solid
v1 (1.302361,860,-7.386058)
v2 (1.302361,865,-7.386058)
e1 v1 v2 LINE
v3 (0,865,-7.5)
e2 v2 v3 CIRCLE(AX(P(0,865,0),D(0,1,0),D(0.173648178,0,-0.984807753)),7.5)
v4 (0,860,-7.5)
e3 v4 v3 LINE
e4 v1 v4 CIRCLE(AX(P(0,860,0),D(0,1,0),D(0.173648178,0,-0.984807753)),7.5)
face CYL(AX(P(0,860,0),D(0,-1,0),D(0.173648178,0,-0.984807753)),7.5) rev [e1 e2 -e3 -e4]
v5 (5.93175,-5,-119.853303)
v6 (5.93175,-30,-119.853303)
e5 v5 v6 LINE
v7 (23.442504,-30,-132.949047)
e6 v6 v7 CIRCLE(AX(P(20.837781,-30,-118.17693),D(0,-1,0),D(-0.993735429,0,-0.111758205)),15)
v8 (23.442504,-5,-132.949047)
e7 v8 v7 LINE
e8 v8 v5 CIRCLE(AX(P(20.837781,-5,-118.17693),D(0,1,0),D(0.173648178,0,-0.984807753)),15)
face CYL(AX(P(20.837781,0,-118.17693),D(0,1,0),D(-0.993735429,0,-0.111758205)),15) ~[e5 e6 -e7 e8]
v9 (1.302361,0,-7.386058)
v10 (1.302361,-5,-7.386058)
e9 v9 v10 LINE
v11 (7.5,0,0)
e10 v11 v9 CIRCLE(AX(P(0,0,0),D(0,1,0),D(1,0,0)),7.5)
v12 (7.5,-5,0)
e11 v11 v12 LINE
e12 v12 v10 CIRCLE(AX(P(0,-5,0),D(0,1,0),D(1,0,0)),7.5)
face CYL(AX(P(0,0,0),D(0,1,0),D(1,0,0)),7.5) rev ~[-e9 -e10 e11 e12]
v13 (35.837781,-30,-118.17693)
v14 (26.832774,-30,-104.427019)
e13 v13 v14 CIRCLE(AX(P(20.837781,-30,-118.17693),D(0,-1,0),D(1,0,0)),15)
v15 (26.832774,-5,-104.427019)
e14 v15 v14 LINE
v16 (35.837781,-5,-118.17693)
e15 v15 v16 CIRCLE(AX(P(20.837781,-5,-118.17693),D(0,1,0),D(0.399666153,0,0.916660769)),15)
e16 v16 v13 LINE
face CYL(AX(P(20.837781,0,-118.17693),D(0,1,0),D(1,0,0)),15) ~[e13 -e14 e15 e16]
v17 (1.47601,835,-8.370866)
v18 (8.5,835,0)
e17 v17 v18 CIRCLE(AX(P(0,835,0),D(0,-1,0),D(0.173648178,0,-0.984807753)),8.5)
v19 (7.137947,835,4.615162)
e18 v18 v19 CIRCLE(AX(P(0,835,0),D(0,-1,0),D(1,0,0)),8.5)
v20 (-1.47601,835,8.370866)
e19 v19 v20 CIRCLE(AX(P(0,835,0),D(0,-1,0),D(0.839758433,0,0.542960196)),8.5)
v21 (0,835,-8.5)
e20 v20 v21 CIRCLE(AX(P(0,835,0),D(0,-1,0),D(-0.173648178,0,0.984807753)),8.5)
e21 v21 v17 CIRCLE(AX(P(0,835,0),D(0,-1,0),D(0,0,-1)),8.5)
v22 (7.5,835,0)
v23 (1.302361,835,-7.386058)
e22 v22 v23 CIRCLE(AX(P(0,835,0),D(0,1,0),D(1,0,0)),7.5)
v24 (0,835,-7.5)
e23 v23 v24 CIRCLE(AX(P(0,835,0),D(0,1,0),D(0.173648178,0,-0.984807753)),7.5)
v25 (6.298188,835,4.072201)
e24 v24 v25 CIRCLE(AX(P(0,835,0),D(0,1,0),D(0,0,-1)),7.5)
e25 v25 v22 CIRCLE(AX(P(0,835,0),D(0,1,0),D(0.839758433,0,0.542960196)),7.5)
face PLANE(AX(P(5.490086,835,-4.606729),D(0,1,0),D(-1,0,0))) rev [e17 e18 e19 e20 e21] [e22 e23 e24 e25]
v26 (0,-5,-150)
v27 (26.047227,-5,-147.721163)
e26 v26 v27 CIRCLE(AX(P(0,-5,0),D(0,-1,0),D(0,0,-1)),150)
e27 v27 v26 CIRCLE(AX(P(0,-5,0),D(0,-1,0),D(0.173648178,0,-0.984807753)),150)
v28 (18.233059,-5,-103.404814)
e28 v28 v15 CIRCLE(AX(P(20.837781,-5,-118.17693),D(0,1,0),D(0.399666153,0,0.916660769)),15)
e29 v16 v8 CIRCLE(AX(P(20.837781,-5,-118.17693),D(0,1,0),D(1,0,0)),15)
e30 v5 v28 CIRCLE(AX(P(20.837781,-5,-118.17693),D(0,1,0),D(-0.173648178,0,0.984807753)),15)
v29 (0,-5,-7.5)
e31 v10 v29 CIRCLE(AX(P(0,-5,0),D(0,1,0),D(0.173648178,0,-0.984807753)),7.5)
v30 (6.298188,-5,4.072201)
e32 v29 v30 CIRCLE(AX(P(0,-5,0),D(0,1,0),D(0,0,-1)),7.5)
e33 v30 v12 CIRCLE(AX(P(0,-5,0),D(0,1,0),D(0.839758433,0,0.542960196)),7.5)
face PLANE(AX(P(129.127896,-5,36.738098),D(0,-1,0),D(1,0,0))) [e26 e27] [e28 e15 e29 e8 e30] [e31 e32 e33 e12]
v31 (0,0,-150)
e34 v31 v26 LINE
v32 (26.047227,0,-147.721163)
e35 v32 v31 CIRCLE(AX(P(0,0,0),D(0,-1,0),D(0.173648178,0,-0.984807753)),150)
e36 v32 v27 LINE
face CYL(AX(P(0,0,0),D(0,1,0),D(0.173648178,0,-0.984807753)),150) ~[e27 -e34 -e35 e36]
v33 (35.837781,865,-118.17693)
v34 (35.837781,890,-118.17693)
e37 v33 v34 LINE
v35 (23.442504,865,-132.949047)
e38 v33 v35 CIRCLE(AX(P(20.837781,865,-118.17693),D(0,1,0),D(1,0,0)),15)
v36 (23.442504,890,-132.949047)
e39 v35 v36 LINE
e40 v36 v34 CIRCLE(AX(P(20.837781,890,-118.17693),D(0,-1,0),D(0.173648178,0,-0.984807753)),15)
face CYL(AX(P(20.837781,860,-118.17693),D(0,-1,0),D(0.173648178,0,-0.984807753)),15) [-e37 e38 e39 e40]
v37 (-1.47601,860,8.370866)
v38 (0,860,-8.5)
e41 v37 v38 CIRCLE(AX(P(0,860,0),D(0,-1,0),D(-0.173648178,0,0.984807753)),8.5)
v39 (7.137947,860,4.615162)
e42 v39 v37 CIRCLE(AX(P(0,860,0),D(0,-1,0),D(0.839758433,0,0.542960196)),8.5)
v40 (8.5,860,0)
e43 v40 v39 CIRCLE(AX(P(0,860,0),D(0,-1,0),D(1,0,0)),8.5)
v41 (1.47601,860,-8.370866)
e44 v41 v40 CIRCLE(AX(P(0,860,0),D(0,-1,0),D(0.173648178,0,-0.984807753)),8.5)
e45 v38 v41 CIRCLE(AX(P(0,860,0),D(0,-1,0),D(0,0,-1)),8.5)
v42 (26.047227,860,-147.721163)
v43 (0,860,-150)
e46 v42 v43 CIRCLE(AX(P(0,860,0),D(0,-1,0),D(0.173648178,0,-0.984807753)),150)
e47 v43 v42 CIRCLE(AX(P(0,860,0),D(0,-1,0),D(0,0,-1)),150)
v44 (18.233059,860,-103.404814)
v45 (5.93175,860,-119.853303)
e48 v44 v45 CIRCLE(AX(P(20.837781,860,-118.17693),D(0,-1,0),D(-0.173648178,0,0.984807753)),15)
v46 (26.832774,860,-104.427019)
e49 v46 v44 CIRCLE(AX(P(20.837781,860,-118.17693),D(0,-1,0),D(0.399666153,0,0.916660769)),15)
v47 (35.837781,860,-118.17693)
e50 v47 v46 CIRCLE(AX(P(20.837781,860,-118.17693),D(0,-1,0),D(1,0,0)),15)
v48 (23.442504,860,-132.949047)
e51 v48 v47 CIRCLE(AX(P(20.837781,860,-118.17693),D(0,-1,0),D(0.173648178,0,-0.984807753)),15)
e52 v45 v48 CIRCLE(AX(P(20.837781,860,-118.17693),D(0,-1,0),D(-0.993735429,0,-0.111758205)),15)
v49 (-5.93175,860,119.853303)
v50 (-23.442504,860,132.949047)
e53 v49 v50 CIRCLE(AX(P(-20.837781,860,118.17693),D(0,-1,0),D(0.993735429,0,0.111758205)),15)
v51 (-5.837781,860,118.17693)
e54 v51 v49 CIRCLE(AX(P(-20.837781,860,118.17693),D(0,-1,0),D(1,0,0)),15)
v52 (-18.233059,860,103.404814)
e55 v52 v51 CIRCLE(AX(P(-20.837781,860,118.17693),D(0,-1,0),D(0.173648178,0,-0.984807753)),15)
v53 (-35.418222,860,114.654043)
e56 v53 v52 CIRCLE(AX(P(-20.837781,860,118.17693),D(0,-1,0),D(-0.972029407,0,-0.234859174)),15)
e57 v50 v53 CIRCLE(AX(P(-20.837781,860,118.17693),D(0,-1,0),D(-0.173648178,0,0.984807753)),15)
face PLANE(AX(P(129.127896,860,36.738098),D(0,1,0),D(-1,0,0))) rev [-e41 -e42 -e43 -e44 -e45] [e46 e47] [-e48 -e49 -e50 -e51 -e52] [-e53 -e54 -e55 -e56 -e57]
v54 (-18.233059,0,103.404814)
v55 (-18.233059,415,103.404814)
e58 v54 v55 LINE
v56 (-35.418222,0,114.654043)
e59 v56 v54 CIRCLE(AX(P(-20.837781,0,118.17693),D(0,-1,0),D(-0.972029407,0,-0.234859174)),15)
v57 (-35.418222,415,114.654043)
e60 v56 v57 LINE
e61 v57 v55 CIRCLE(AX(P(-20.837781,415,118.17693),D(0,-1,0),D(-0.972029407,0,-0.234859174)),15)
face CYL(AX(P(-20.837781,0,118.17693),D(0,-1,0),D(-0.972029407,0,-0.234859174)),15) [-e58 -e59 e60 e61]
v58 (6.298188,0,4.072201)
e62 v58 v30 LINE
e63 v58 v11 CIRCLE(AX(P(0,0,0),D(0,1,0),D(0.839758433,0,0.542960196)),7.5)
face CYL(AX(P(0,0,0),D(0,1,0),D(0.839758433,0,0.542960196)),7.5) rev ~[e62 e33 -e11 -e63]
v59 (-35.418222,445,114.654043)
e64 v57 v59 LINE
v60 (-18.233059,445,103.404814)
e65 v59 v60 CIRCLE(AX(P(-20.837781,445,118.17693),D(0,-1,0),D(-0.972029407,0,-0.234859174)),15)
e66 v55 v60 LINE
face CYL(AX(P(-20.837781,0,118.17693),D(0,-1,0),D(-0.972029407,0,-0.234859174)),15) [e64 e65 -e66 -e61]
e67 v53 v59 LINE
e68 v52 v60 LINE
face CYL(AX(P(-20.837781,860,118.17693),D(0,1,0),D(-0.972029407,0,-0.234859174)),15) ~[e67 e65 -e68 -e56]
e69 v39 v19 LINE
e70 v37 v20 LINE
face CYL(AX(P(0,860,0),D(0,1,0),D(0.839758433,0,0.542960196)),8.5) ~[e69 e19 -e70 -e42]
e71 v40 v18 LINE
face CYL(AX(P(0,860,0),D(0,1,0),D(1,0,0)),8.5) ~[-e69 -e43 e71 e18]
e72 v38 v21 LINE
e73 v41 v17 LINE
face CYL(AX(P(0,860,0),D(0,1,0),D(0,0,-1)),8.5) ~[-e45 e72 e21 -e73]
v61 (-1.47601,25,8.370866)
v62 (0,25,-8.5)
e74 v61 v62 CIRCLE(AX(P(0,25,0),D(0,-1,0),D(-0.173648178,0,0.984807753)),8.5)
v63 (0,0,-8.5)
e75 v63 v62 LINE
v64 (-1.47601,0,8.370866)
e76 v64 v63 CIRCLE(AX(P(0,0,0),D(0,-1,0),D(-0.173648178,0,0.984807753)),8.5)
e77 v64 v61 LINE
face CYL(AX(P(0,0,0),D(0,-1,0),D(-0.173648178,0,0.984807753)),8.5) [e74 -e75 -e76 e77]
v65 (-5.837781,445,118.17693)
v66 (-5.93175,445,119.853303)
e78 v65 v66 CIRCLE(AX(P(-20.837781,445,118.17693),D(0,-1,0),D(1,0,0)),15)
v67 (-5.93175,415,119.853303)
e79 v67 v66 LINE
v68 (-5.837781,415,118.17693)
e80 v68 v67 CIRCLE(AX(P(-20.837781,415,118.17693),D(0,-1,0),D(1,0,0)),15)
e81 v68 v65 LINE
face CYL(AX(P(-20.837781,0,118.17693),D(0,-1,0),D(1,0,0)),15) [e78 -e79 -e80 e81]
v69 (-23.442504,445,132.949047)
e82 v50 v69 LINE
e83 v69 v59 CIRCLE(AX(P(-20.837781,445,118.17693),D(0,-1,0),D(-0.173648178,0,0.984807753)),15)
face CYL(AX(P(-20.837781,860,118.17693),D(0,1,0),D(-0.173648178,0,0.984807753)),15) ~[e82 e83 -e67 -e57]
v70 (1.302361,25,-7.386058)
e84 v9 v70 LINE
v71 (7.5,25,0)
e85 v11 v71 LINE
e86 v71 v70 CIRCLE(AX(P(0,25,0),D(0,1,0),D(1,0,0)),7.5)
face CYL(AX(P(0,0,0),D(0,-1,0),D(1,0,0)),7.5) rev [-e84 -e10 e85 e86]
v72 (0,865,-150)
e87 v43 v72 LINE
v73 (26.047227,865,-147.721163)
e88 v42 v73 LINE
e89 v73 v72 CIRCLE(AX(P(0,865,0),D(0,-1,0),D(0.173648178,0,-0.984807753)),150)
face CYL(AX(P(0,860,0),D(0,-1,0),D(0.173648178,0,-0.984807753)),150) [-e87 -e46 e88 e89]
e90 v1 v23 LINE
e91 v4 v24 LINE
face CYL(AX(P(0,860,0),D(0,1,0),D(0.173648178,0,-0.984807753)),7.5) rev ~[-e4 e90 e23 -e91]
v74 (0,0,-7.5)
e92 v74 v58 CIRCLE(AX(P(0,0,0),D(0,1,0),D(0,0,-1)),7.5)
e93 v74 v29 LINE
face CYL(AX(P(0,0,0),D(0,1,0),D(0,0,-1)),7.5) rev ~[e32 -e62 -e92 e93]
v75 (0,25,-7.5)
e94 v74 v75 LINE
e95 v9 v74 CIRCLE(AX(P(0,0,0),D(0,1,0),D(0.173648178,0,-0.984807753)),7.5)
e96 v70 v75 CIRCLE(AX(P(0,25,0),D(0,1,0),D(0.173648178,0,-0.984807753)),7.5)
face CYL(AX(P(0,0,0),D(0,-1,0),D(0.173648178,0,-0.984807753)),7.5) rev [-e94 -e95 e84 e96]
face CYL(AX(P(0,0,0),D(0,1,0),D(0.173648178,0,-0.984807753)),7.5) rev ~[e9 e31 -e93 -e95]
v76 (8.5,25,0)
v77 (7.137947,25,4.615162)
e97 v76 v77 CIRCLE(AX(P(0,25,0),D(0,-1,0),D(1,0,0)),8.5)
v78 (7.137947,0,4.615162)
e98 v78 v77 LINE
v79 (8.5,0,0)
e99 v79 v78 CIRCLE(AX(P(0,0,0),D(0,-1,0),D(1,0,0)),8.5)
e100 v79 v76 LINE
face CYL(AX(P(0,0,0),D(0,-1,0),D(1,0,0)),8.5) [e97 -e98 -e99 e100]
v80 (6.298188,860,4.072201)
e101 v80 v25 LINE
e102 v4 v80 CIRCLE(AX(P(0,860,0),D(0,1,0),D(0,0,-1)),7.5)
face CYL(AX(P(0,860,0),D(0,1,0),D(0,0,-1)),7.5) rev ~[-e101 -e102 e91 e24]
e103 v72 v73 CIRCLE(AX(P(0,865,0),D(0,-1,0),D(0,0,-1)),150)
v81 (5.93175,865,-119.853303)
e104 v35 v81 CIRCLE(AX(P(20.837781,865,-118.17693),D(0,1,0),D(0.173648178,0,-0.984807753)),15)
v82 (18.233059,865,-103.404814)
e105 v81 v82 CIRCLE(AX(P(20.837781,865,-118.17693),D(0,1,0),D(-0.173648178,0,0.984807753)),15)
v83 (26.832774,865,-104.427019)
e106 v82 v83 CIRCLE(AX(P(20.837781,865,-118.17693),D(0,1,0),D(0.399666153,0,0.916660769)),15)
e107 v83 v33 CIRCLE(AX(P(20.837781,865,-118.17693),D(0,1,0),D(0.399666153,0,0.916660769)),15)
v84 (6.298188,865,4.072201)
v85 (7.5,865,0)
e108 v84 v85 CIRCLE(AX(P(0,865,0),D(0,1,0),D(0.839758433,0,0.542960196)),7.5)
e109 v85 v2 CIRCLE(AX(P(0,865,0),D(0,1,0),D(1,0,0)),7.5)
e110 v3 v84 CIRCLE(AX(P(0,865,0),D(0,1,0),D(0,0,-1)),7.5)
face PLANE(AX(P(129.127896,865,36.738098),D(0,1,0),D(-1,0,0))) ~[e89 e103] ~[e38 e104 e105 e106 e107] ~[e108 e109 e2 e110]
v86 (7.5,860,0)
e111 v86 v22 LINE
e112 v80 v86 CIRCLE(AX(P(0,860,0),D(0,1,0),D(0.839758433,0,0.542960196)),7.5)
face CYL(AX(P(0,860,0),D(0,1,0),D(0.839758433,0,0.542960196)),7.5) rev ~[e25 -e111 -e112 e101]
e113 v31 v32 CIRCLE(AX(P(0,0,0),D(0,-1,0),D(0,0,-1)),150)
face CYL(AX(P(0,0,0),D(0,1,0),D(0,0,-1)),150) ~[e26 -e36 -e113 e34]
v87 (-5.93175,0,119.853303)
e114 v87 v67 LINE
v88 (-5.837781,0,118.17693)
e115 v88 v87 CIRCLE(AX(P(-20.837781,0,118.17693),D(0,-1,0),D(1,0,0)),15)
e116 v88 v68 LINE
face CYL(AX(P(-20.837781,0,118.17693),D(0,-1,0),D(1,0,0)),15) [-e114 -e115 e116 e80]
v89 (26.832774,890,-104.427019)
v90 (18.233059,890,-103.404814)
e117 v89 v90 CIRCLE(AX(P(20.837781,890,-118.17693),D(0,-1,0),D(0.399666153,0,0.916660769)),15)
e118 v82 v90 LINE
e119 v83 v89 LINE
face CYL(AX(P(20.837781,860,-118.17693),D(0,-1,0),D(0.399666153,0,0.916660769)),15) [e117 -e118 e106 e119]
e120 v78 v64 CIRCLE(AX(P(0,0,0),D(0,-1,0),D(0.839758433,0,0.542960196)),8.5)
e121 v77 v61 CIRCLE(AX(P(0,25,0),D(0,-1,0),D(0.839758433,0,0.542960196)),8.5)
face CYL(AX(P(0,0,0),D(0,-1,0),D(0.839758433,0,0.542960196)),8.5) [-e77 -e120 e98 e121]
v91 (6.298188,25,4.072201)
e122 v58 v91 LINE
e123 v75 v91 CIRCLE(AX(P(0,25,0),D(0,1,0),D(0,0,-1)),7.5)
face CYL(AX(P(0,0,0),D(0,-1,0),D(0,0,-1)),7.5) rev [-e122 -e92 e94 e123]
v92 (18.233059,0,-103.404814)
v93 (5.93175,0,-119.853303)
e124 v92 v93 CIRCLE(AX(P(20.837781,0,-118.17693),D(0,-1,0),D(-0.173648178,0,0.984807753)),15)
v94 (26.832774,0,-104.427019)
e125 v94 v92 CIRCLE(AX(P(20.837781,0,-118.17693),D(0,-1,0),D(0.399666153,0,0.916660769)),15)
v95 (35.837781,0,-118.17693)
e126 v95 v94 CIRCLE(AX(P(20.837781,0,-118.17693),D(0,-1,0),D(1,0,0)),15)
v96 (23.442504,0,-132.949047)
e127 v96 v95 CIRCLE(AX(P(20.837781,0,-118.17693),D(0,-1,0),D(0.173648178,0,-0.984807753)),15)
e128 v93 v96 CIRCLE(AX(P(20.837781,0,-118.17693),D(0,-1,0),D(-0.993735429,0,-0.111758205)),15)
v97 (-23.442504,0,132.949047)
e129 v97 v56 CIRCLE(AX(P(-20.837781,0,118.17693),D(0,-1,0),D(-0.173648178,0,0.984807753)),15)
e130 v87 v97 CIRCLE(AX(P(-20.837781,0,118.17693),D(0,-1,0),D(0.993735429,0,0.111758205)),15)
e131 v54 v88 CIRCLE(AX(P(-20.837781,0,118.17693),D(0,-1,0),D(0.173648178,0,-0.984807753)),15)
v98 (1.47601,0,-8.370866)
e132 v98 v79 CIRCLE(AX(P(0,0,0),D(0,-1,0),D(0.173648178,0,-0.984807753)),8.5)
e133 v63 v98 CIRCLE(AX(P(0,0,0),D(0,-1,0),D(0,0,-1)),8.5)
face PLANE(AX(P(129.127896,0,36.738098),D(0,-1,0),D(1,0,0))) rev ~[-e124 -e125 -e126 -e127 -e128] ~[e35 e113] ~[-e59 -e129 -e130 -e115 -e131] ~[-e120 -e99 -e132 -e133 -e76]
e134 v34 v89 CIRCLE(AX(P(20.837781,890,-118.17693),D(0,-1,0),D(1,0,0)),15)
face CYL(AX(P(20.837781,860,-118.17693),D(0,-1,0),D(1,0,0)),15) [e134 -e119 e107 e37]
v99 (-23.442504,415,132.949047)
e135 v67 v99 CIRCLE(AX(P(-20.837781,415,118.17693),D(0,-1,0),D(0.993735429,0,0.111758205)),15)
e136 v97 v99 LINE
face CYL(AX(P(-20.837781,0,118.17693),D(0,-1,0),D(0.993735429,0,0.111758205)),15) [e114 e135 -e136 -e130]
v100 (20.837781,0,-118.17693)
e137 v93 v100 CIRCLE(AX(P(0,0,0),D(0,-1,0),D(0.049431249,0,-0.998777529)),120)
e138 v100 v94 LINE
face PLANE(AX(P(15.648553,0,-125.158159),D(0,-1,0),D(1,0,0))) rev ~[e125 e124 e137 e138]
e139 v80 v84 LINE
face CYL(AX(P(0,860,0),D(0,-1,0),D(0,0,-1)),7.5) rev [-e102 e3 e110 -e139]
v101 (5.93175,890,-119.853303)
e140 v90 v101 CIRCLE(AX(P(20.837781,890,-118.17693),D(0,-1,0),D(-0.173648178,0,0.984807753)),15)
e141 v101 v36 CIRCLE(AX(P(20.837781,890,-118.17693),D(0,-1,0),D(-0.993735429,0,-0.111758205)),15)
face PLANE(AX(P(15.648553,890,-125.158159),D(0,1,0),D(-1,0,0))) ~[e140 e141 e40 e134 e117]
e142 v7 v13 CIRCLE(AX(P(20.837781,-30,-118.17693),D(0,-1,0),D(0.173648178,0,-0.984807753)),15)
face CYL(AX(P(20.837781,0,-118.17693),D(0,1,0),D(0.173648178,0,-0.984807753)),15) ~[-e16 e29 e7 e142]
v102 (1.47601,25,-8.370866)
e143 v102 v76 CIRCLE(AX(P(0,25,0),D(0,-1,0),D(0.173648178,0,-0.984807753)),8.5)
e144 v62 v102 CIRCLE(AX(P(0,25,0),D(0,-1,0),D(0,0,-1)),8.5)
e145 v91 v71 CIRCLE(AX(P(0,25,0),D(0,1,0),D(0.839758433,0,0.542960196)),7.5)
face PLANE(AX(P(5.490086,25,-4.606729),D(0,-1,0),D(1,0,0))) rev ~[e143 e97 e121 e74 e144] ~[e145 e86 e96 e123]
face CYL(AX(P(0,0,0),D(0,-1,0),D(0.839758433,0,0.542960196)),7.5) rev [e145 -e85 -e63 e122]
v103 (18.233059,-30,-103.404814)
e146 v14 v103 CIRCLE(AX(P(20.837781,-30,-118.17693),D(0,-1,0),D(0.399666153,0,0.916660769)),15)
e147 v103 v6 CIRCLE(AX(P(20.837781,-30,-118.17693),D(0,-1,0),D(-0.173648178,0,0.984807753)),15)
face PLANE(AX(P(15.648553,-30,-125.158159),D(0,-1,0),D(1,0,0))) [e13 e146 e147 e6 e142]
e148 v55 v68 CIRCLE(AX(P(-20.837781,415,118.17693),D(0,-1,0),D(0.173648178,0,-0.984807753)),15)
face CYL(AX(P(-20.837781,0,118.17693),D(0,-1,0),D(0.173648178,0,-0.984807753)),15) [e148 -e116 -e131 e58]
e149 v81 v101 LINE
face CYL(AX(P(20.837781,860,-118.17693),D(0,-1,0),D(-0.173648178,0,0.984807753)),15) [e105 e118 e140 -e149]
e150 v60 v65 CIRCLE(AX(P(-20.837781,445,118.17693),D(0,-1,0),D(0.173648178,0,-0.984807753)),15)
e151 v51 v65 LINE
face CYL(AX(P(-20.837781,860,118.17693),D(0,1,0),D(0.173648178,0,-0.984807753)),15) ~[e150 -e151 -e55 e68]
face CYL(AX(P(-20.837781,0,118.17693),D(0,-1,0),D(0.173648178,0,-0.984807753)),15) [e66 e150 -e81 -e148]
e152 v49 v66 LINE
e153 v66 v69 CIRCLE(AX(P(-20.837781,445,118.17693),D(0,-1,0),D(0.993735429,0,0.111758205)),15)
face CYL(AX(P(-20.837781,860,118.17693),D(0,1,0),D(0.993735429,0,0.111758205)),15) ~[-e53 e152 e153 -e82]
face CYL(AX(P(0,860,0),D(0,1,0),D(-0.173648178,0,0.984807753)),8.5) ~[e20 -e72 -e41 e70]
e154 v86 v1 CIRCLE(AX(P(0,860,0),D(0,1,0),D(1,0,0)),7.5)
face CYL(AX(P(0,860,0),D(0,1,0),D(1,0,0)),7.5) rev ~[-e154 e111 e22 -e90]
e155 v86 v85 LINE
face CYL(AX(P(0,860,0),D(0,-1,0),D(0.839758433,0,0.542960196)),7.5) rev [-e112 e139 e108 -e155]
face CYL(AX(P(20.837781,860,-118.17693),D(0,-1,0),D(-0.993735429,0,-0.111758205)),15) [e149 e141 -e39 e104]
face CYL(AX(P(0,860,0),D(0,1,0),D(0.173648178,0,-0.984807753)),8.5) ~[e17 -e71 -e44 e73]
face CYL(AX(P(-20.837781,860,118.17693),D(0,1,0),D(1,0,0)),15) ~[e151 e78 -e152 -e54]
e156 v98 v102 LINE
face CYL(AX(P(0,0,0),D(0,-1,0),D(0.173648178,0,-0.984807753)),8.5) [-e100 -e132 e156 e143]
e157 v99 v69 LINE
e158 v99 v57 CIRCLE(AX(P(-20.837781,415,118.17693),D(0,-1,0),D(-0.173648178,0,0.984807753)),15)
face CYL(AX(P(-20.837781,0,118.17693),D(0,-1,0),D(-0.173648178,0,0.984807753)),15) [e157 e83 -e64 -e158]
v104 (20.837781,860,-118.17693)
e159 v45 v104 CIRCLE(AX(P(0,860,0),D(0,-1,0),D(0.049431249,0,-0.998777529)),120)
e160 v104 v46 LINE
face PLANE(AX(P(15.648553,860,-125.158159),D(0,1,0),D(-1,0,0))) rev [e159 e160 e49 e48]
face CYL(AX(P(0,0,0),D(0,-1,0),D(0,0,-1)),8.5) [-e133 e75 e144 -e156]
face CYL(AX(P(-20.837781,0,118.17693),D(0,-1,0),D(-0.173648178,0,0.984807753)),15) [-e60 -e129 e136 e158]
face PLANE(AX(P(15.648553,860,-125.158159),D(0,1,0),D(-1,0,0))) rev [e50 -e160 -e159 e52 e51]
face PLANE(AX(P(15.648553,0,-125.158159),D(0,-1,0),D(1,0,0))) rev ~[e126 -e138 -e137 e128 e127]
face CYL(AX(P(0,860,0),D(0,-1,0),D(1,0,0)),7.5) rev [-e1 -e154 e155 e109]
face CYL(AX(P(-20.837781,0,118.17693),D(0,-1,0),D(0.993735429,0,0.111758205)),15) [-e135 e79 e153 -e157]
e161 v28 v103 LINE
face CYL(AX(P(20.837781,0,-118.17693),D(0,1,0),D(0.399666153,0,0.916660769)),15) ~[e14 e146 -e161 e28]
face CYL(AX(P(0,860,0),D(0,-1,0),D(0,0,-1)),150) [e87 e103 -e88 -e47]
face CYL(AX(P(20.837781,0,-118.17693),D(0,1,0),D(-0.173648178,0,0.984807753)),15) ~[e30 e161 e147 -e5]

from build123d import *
from build123d import SkipClean  # not in build123d's __all__

# Parameters (mm, degrees)
F1_DEPTH = 25
F2_DEPTH = 445
F3_DEPTH = 30
F4_DEPTH = 5


# Not quite as in the source:
# - after a boolean that leaves OpenCascade's solid faulty, fix() repairs it


with BuildPart() as f1:
    # F0 (on Front) → F1 (new body)
    with BuildSketch(Plane.XZ):
        with BuildLine():
            ThreePointArc((1.4760095102, -8.3708659006), (6.5113777665, -5.4636946823), (8.5, 0))
            Line((8.5, 0), (7.5, 0))
            ThreePointArc((7.5, 0), (5.7453333234, -4.8209070726), (1.3023613325, -7.3860581476))
            Line((1.3023613325, -7.3860581476), (1.4760095102, -8.3708659006))
        make_face()
        with BuildLine():
            Line((7.5, 0), (8.5, 0))
            ThreePointArc((8.5, 0), (8.1523783886, 2.405977267), (7.1379466801, 4.6151616647))
            Line((7.1379466801, 4.6151616647), (6.2981882472, 4.0722014689))
            ThreePointArc((6.2981882472, 4.0722014689), (7.1932750487, 2.122921118), (7.5, 0))
        make_face()
        with BuildLine():
            ThreePointArc((-1.4760095102, 8.3708659006), (-8.4676549338, -0.7408238134), (0, -8.5))
            Line((0, -8.5), (0, -7.5))
            ThreePointArc((0, -7.5), (-7.4714602357, -0.6536680706), (-1.3023613325, 7.3860581476))
            Line((-1.3023613325, 7.3860581476), (-1.4760095102, 8.3708659006))
        make_face()
        with BuildLine():
            Line((0, -7.5), (0, -8.5))
            ThreePointArc((0, -8.5), (0.7408238134, -8.4676549338), (1.4760095102, -8.3708659006))
            Line((1.4760095102, -8.3708659006), (1.3023613325, -7.3860581476))
            ThreePointArc((1.3023613325, -7.3860581476), (0.6536680706, -7.4714602357), (0, -7.5))
        make_face()
        with BuildLine():
            Line((6.2981882472, 4.0722014689), (7.1379466801, 4.6151616647))
            ThreePointArc((7.1379466801, 4.6151616647), (3.397162302, 7.7916165392), (-1.4760095102, 8.3708659006))
            Line((-1.4760095102, 8.3708659006), (-1.3023613325, 7.3860581476))
            ThreePointArc((-1.3023613325, 7.3860581476), (2.9974961488, 6.8749557699), (6.2981882472, 4.0722014689))
        make_face()
    extrude(amount=-F1_DEPTH)



with BuildPart() as f2:
    # F0 (on Front) → F2 (new body)
    with BuildSketch(Plane.XZ):
        with BuildLine():
            ThreePointArc((-5.9317498787, 119.8533034312), (-11.8541755818, 130.1892085775), (-23.442503985, 132.9490466566))
            Line((-23.442503985, 132.9490466566), (-20.83778132, 118.1769303615))
            ThreePointArc((-20.83778132, 118.1769303615), (-13.4109845581, 119.2482515309), (-5.9317498787, 119.8533034312))
        make_face()
        with BuildLine():
            Line((-20.83778132, 118.1769303615), (-23.442503985, 132.9490466566))
            ThreePointArc((-23.442503985, 132.9490466566), (-33.3880504574, 126.3922054378), (-35.4182224283, 114.6540427548))
            ThreePointArc((-35.4182224283, 114.6540427548), (-28.1831008533, 116.6435288659), (-20.83778132, 118.1769303615))
        make_face()
        with BuildLine():
            ThreePointArc((-5.9317498787, 119.8533034312), (-13.4109845581, 119.2482515309), (-20.83778132, 118.1769303615))
            Line((-20.83778132, 118.1769303615), (-18.233058655, 103.4048140663))
            ThreePointArc((-18.233058655, 103.4048140663), (-9.3471146732, 108.5351162162), (-5.83778132, 118.1769303615))
            ThreePointArc((-5.83778132, 118.1769303615), (-5.8612918846, 119.016432708), (-5.9317498787, 119.8533034312))
        make_face()
        with BuildLine():
            Line((-18.233058655, 103.4048140663), (-20.83778132, 118.1769303615))
            ThreePointArc((-20.83778132, 118.1769303615), (-28.1831008533, 116.6435288659), (-35.4182224283, 114.6540427548))
            ThreePointArc((-35.4182224283, 114.6540427548), (-29.0530563964, 105.6266612241), (-18.233058655, 103.4048140663))
        make_face()
    extrude(amount=-F2_DEPTH)


with BuildPart() as f3:
    # F0 (on Front) → F3 (new body)
    with BuildSketch(Plane.XZ):
        with BuildLine():
            ThreePointArc((5.9317498787, -119.8533034312), (11.8541755818, -130.1892085775), (23.442503985, -132.9490466566))
            Line((23.442503985, -132.9490466566), (20.83778132, -118.1769303615))
            ThreePointArc((20.83778132, -118.1769303615), (13.4109845581, -119.2482515309), (5.9317498787, -119.8533034312))
        make_face()
        with BuildLine():
            Line((20.83778132, -118.1769303615), (23.442503985, -132.9490466566))
            ThreePointArc((23.442503985, -132.9490466566), (32.3284479668, -127.8187445068), (35.83778132, -118.1769303615))
            ThreePointArc((35.83778132, -118.1769303615), (35.7325222816, -116.4030386826), (35.4182224283, -114.6540427548))
            ThreePointArc((35.4182224283, -114.6540427548), (28.1831008533, -116.6435288659), (20.83778132, -118.1769303615))
        make_face()
        with BuildLine():
            ThreePointArc((20.83778132, -118.1769303615), (28.1831008533, -116.6435288659), (35.4182224283, -114.6540427548))
            ThreePointArc((35.4182224283, -114.6540427548), (32.3262590082, -108.5325081181), (26.8327736176, -104.4270188217))
            Line((26.8327736176, -104.4270188217), (20.83778132, -118.1769303615))
        make_face()
        with BuildLine():
            Line((18.233058655, -103.4048140663), (20.83778132, -118.1769303615))
            Line((20.83778132, -118.1769303615), (26.8327736176, -104.4270188217))
            ThreePointArc((26.8327736176, -104.4270188217), (22.6082918921, -103.2817871156), (18.233058655, -103.4048140663))
        make_face()
        with BuildLine():
            ThreePointArc((5.9317498787, -119.8533034312), (13.4109845581, -119.2482515309), (20.83778132, -118.1769303615))
            Line((20.83778132, -118.1769303615), (18.233058655, -103.4048140663))
            ThreePointArc((18.233058655, -103.4048140663), (8.8255031039, -109.1933246233), (5.9317498787, -119.8533034312))
        make_face()
    extrude(amount=F3_DEPTH)


with BuildPart() as f1_1:
    add(f1.part, clean=False)

    with SkipClean():  # cleaning this boolean's faces spoils the solid; the shape is the same uncleaned
        add(f2.part)  # F4 merges F2

    with SkipClean():  # cleaning this boolean's faces spoils the solid; the shape is the same uncleaned
        add(f3.part)  # F4 merges F3
    # F0 (on Front) → F4 (join)
    with BuildSketch(Plane.XZ):
        with BuildLine():
            Line((120, 0), (150, 0))
            ThreePointArc((150, 0), (143.8655009749, 42.4584223594), (125.9637649434, 81.4440293778))
            Line((125.9637649434, 81.4440293778), (113.367388449, 73.29962644))
            ThreePointArc((113.367388449, 73.29962644), (115.1575620522, 69.4010657382), (115.7710119547, 65.1552235022))
            ThreePointArc((115.7710119547, 65.1552235022), (113.7154721999, 57.5762427686), (108.11221876, 52.0744481949))
            ThreePointArc((108.11221876, 52.0744481949), (116.9903121015, 26.7070566406), (120, 0))
        make_face()
        with BuildLine():
            ThreePointArc((26.04722665, -147.7211629518), (114.9066664678, -96.418141453), (150, 0))
            Line((150, 0), (120, 0))
            ThreePointArc((120, 0), (96.5665229036, -71.2383790825), (35.4182224283, -114.6540427548))
            ThreePointArc((35.4182224283, -114.6540427548), (35.7325222816, -116.4030386826), (35.83778132, -118.1769303615))
            ThreePointArc((35.83778132, -118.1769303615), (32.3284479668, -127.8187445068), (23.442503985, -132.9490466566))
            Line((23.442503985, -132.9490466566), (26.04722665, -147.7211629518))
        make_face()
        with BuildLine():
            Line((113.367388449, 73.29962644), (125.9637649434, 81.4440293778))
            ThreePointArc((125.9637649434, 81.4440293778), (59.949922976, 137.4991153978), (-26.04722665, 147.7211629518))
            Line((-26.04722665, 147.7211629518), (-23.442503985, 132.9490466566))
            ThreePointArc((-23.442503985, 132.9490466566), (-11.8541755818, 130.1892085775), (-5.9317498787, 119.8533034312))
            ThreePointArc((-5.9317498787, 119.8533034312), (47.9599383808, 109.9992923182), (91.8552580876, 77.2179484424))
            ThreePointArc((91.8552580876, 77.2179484424), (103.4589586729, 79.9124231838), (113.367388449, 73.29962644))
        make_face()
        with BuildLine():
            ThreePointArc((0, -150), (13.0733614121, -149.4292047138), (26.04722665, -147.7211629518))
            Line((26.04722665, -147.7211629518), (23.442503985, -132.9490466566))
            ThreePointArc((23.442503985, -132.9490466566), (11.8541755818, -130.1892085775), (5.9317498787, -119.8533034312))
            ThreePointArc((5.9317498787, -119.8533034312), (2.9667817794, -119.963320252), (0, -120))
            Line((0, -120), (0, -150))
        make_face()
        with BuildLine():
            ThreePointArc((35.4182224283, -114.6540427548), (96.5665229036, -71.2383790825), (120, 0))
            Line((120, 0), (72.3631882451, 0))
            Line((72.3631882451, 0), (26.8327736176, -104.4270188217))
            ThreePointArc((26.8327736176, -104.4270188217), (32.3262590082, -108.5325081181), (35.4182224283, -114.6540427548))
        make_face()
        with BuildLine():
            Line((72.3631882451, 0), (120, 0))
            ThreePointArc((120, 0), (116.9903121015, 26.7070566406), (108.11221876, 52.0744481949))
            ThreePointArc((108.11221876, 52.0744481949), (101.522682893, 50.1740689806), (94.7760196571, 51.4053119625))
            Line((94.7760196571, 51.4053119625), (72.3631882451, 0))
        make_face()
        with BuildLine():
            Line((-23.442503985, 132.9490466566), (-26.04722665, 147.7211629518))
            ThreePointArc((-26.04722665, 147.7211629518), (-149.4292047138, -13.0733614122), (0, -150))
            Line((0, -150), (0, -120))
            ThreePointArc((0, -120), (-118.6559841107, -17.9097022508), (-35.4182224283, 114.6540427548))
            ThreePointArc((-35.4182224283, 114.6540427548), (-33.3880504574, 126.3922054378), (-23.442503985, 132.9490466566))
        make_face()
        with BuildLine():
            ThreePointArc((115.7710119547, 65.1552235022), (115.1575620522, 69.4010657382), (113.367388449, 73.29962644))
            Line((113.367388449, 73.29962644), (100.7710119547, 65.1552235022))
            ThreePointArc((100.7710119547, 65.1552235022), (104.6462024591, 58.7296544421), (108.11221876, 52.0744481949))
            ThreePointArc((108.11221876, 52.0744481949), (113.7154721999, 57.5762427686), (115.7710119547, 65.1552235022))
        make_face()
        with BuildLine():
            Line((100.7710119547, 65.1552235022), (113.367388449, 73.29962644))
            ThreePointArc((113.367388449, 73.29962644), (103.4589586729, 79.9124231838), (91.8552580876, 77.2179484424))
            ThreePointArc((91.8552580876, 77.2179484424), (96.5017995213, 71.3260309365), (100.7710119547, 65.1552235022))
        make_face()
        with BuildLine():
            Line((26.8327736176, -104.4270188217), (72.3631882451, 0))
            Line((72.3631882451, 0), (8.5, 0))
            ThreePointArc((8.5, 0), (6.5113777665, -5.4636946823), (1.4760095102, -8.3708659006))
            Line((1.4760095102, -8.3708659006), (18.233058655, -103.4048140663))
            ThreePointArc((18.233058655, -103.4048140663), (22.6082918921, -103.2817871156), (26.8327736176, -104.4270188217))
        make_face()
        with BuildLine():
            Line((8.5, 0), (72.3631882451, 0))
            Line((72.3631882451, 0), (94.7760196571, 51.4053119625))
            ThreePointArc((94.7760196571, 51.4053119625), (91.0619862538, 53.7212906732), (88.1746354604, 57.0108205645))
            Line((88.1746354604, 57.0108205645), (7.1379466801, 4.6151616647))
            ThreePointArc((7.1379466801, 4.6151616647), (8.1523783886, 2.405977267), (8.5, 0))
        make_face()
        with BuildLine():
            ThreePointArc((94.7760196571, 51.4053119625), (101.522682893, 50.1740689806), (108.11221876, 52.0744481949))
            ThreePointArc((108.11221876, 52.0744481949), (104.6462024591, 58.7296544421), (100.7710119547, 65.1552235022))
            Line((100.7710119547, 65.1552235022), (94.7760196571, 51.4053119625))
        make_face()
        with BuildLine():
            ThreePointArc((-5.9317498787, 119.8533034312), (-11.8541755818, 130.1892085775), (-23.442503985, 132.9490466566))
            Line((-23.442503985, 132.9490466566), (-20.83778132, 118.1769303615))
            ThreePointArc((-20.83778132, 118.1769303615), (-13.4109845581, 119.2482515309), (-5.9317498787, 119.8533034312))
        make_face()
        with BuildLine():
            Line((-20.83778132, 118.1769303615), (-23.442503985, 132.9490466566))
            ThreePointArc((-23.442503985, 132.9490466566), (-33.3880504574, 126.3922054378), (-35.4182224283, 114.6540427548))
            ThreePointArc((-35.4182224283, 114.6540427548), (-28.1831008533, 116.6435288659), (-20.83778132, 118.1769303615))
        make_face()
        with BuildLine():
            Line((94.7760196571, 51.4053119625), (100.7710119547, 65.1552235022))
            Line((100.7710119547, 65.1552235022), (88.1746354604, 57.0108205645))
            ThreePointArc((88.1746354604, 57.0108205645), (91.0619862538, 53.7212906732), (94.7760196571, 51.4053119625))
        make_face()
        with BuildLine():
            Line((88.1746354604, 57.0108205645), (100.7710119547, 65.1552235022))
            ThreePointArc((100.7710119547, 65.1552235022), (96.5017995213, 71.3260309365), (91.8552580876, 77.2179484424))
            ThreePointArc((91.8552580876, 77.2179484424), (86.0138122732, 67.8431702204), (88.1746354604, 57.0108205645))
        make_face()
        with BuildLine():
            ThreePointArc((88.1746354604, 57.0108205645), (86.0138122732, 67.8431702204), (91.8552580876, 77.2179484424))
            ThreePointArc((91.8552580876, 77.2179484424), (47.9599383808, 109.9992923182), (-5.9317498787, 119.8533034312))
            ThreePointArc((-5.9317498787, 119.8533034312), (-5.8612918846, 119.016432708), (-5.83778132, 118.1769303615))
            ThreePointArc((-5.83778132, 118.1769303615), (-9.3471146732, 108.5351162162), (-18.233058655, 103.4048140663))
            Line((-18.233058655, 103.4048140663), (-1.4760095102, 8.3708659006))
            ThreePointArc((-1.4760095102, 8.3708659006), (3.397162302, 7.7916165392), (7.1379466801, 4.6151616647))
            Line((7.1379466801, 4.6151616647), (88.1746354604, 57.0108205645))
        make_face()
        with BuildLine():
            ThreePointArc((-35.4182224283, 114.6540427548), (-118.6559841107, -17.9097022508), (0, -120))
            Line((0, -120), (0, -8.5))
            ThreePointArc((0, -8.5), (-8.4676549338, -0.7408238134), (-1.4760095102, 8.3708659006))
            Line((-1.4760095102, 8.3708659006), (-18.233058655, 103.4048140663))
            ThreePointArc((-18.233058655, 103.4048140663), (-29.0530563964, 105.6266612241), (-35.4182224283, 114.6540427548))
        make_face()
        with BuildLine():
            Line((0, -8.5), (0, -120))
            ThreePointArc((0, -120), (2.9667817794, -119.963320252), (5.9317498787, -119.8533034312))
            ThreePointArc((5.9317498787, -119.8533034312), (8.8255031039, -109.1933246233), (18.233058655, -103.4048140663))
            Line((18.233058655, -103.4048140663), (1.4760095102, -8.3708659006))
            ThreePointArc((1.4760095102, -8.3708659006), (0.7408238134, -8.4676549338), (0, -8.5))
        make_face()
        with BuildLine():
            Line((18.233058655, -103.4048140663), (20.83778132, -118.1769303615))
            Line((20.83778132, -118.1769303615), (26.8327736176, -104.4270188217))
            ThreePointArc((26.8327736176, -104.4270188217), (22.6082918921, -103.2817871156), (18.233058655, -103.4048140663))
        make_face()
        with BuildLine():
            ThreePointArc((5.9317498787, -119.8533034312), (13.4109845581, -119.2482515309), (20.83778132, -118.1769303615))
            Line((20.83778132, -118.1769303615), (18.233058655, -103.4048140663))
            ThreePointArc((18.233058655, -103.4048140663), (8.8255031039, -109.1933246233), (5.9317498787, -119.8533034312))
        make_face()
        with BuildLine():
            ThreePointArc((1.4760095102, -8.3708659006), (6.5113777665, -5.4636946823), (8.5, 0))
            Line((8.5, 0), (7.5, 0))
            ThreePointArc((7.5, 0), (5.7453333234, -4.8209070726), (1.3023613325, -7.3860581476))
            Line((1.3023613325, -7.3860581476), (1.4760095102, -8.3708659006))
        make_face()
        with BuildLine():
            Line((7.5, 0), (8.5, 0))
            ThreePointArc((8.5, 0), (8.1523783886, 2.405977267), (7.1379466801, 4.6151616647))
            Line((7.1379466801, 4.6151616647), (6.2981882472, 4.0722014689))
            ThreePointArc((6.2981882472, 4.0722014689), (7.1932750487, 2.122921118), (7.5, 0))
        make_face()
        with BuildLine():
            ThreePointArc((-5.9317498787, 119.8533034312), (-13.4109845581, 119.2482515309), (-20.83778132, 118.1769303615))
            Line((-20.83778132, 118.1769303615), (-18.233058655, 103.4048140663))
            ThreePointArc((-18.233058655, 103.4048140663), (-9.3471146732, 108.5351162162), (-5.83778132, 118.1769303615))
            ThreePointArc((-5.83778132, 118.1769303615), (-5.8612918846, 119.016432708), (-5.9317498787, 119.8533034312))
        make_face()
        with BuildLine():
            Line((-18.233058655, 103.4048140663), (-20.83778132, 118.1769303615))
            ThreePointArc((-20.83778132, 118.1769303615), (-28.1831008533, 116.6435288659), (-35.4182224283, 114.6540427548))
            ThreePointArc((-35.4182224283, 114.6540427548), (-29.0530563964, 105.6266612241), (-18.233058655, 103.4048140663))
        make_face()
        with BuildLine():
            ThreePointArc((-1.4760095102, 8.3708659006), (-8.4676549338, -0.7408238134), (0, -8.5))
            Line((0, -8.5), (0, -7.5))
            ThreePointArc((0, -7.5), (-7.4714602357, -0.6536680706), (-1.3023613325, 7.3860581476))
            Line((-1.3023613325, 7.3860581476), (-1.4760095102, 8.3708659006))
        make_face()
        with BuildLine():
            Line((0, -7.5), (0, -8.5))
            ThreePointArc((0, -8.5), (0.7408238134, -8.4676549338), (1.4760095102, -8.3708659006))
            Line((1.4760095102, -8.3708659006), (1.3023613325, -7.3860581476))
            ThreePointArc((1.3023613325, -7.3860581476), (0.6536680706, -7.4714602357), (0, -7.5))
        make_face()
        with BuildLine():
            Line((6.2981882472, 4.0722014689), (7.1379466801, 4.6151616647))
            ThreePointArc((7.1379466801, 4.6151616647), (3.397162302, 7.7916165392), (-1.4760095102, 8.3708659006))
            Line((-1.4760095102, 8.3708659006), (-1.3023613325, 7.3860581476))
            ThreePointArc((-1.3023613325, 7.3860581476), (2.9974961488, 6.8749557699), (6.2981882472, 4.0722014689))
        make_face()
    with SkipClean():  # cleaning this boolean's faces spoils the solid; the shape is the same uncleaned
        extrude(amount=F4_DEPTH)

    # F6: F1 across plane


with BuildPart() as f1_2:
    add(f1_1.part, clean=False)
    add(f1_1.part.mirror(Plane.XZ.offset(-430)), clean=False)

    add(f1_2.part.fix(), mode=Mode.REPLACE)


solid = f1_2.part
